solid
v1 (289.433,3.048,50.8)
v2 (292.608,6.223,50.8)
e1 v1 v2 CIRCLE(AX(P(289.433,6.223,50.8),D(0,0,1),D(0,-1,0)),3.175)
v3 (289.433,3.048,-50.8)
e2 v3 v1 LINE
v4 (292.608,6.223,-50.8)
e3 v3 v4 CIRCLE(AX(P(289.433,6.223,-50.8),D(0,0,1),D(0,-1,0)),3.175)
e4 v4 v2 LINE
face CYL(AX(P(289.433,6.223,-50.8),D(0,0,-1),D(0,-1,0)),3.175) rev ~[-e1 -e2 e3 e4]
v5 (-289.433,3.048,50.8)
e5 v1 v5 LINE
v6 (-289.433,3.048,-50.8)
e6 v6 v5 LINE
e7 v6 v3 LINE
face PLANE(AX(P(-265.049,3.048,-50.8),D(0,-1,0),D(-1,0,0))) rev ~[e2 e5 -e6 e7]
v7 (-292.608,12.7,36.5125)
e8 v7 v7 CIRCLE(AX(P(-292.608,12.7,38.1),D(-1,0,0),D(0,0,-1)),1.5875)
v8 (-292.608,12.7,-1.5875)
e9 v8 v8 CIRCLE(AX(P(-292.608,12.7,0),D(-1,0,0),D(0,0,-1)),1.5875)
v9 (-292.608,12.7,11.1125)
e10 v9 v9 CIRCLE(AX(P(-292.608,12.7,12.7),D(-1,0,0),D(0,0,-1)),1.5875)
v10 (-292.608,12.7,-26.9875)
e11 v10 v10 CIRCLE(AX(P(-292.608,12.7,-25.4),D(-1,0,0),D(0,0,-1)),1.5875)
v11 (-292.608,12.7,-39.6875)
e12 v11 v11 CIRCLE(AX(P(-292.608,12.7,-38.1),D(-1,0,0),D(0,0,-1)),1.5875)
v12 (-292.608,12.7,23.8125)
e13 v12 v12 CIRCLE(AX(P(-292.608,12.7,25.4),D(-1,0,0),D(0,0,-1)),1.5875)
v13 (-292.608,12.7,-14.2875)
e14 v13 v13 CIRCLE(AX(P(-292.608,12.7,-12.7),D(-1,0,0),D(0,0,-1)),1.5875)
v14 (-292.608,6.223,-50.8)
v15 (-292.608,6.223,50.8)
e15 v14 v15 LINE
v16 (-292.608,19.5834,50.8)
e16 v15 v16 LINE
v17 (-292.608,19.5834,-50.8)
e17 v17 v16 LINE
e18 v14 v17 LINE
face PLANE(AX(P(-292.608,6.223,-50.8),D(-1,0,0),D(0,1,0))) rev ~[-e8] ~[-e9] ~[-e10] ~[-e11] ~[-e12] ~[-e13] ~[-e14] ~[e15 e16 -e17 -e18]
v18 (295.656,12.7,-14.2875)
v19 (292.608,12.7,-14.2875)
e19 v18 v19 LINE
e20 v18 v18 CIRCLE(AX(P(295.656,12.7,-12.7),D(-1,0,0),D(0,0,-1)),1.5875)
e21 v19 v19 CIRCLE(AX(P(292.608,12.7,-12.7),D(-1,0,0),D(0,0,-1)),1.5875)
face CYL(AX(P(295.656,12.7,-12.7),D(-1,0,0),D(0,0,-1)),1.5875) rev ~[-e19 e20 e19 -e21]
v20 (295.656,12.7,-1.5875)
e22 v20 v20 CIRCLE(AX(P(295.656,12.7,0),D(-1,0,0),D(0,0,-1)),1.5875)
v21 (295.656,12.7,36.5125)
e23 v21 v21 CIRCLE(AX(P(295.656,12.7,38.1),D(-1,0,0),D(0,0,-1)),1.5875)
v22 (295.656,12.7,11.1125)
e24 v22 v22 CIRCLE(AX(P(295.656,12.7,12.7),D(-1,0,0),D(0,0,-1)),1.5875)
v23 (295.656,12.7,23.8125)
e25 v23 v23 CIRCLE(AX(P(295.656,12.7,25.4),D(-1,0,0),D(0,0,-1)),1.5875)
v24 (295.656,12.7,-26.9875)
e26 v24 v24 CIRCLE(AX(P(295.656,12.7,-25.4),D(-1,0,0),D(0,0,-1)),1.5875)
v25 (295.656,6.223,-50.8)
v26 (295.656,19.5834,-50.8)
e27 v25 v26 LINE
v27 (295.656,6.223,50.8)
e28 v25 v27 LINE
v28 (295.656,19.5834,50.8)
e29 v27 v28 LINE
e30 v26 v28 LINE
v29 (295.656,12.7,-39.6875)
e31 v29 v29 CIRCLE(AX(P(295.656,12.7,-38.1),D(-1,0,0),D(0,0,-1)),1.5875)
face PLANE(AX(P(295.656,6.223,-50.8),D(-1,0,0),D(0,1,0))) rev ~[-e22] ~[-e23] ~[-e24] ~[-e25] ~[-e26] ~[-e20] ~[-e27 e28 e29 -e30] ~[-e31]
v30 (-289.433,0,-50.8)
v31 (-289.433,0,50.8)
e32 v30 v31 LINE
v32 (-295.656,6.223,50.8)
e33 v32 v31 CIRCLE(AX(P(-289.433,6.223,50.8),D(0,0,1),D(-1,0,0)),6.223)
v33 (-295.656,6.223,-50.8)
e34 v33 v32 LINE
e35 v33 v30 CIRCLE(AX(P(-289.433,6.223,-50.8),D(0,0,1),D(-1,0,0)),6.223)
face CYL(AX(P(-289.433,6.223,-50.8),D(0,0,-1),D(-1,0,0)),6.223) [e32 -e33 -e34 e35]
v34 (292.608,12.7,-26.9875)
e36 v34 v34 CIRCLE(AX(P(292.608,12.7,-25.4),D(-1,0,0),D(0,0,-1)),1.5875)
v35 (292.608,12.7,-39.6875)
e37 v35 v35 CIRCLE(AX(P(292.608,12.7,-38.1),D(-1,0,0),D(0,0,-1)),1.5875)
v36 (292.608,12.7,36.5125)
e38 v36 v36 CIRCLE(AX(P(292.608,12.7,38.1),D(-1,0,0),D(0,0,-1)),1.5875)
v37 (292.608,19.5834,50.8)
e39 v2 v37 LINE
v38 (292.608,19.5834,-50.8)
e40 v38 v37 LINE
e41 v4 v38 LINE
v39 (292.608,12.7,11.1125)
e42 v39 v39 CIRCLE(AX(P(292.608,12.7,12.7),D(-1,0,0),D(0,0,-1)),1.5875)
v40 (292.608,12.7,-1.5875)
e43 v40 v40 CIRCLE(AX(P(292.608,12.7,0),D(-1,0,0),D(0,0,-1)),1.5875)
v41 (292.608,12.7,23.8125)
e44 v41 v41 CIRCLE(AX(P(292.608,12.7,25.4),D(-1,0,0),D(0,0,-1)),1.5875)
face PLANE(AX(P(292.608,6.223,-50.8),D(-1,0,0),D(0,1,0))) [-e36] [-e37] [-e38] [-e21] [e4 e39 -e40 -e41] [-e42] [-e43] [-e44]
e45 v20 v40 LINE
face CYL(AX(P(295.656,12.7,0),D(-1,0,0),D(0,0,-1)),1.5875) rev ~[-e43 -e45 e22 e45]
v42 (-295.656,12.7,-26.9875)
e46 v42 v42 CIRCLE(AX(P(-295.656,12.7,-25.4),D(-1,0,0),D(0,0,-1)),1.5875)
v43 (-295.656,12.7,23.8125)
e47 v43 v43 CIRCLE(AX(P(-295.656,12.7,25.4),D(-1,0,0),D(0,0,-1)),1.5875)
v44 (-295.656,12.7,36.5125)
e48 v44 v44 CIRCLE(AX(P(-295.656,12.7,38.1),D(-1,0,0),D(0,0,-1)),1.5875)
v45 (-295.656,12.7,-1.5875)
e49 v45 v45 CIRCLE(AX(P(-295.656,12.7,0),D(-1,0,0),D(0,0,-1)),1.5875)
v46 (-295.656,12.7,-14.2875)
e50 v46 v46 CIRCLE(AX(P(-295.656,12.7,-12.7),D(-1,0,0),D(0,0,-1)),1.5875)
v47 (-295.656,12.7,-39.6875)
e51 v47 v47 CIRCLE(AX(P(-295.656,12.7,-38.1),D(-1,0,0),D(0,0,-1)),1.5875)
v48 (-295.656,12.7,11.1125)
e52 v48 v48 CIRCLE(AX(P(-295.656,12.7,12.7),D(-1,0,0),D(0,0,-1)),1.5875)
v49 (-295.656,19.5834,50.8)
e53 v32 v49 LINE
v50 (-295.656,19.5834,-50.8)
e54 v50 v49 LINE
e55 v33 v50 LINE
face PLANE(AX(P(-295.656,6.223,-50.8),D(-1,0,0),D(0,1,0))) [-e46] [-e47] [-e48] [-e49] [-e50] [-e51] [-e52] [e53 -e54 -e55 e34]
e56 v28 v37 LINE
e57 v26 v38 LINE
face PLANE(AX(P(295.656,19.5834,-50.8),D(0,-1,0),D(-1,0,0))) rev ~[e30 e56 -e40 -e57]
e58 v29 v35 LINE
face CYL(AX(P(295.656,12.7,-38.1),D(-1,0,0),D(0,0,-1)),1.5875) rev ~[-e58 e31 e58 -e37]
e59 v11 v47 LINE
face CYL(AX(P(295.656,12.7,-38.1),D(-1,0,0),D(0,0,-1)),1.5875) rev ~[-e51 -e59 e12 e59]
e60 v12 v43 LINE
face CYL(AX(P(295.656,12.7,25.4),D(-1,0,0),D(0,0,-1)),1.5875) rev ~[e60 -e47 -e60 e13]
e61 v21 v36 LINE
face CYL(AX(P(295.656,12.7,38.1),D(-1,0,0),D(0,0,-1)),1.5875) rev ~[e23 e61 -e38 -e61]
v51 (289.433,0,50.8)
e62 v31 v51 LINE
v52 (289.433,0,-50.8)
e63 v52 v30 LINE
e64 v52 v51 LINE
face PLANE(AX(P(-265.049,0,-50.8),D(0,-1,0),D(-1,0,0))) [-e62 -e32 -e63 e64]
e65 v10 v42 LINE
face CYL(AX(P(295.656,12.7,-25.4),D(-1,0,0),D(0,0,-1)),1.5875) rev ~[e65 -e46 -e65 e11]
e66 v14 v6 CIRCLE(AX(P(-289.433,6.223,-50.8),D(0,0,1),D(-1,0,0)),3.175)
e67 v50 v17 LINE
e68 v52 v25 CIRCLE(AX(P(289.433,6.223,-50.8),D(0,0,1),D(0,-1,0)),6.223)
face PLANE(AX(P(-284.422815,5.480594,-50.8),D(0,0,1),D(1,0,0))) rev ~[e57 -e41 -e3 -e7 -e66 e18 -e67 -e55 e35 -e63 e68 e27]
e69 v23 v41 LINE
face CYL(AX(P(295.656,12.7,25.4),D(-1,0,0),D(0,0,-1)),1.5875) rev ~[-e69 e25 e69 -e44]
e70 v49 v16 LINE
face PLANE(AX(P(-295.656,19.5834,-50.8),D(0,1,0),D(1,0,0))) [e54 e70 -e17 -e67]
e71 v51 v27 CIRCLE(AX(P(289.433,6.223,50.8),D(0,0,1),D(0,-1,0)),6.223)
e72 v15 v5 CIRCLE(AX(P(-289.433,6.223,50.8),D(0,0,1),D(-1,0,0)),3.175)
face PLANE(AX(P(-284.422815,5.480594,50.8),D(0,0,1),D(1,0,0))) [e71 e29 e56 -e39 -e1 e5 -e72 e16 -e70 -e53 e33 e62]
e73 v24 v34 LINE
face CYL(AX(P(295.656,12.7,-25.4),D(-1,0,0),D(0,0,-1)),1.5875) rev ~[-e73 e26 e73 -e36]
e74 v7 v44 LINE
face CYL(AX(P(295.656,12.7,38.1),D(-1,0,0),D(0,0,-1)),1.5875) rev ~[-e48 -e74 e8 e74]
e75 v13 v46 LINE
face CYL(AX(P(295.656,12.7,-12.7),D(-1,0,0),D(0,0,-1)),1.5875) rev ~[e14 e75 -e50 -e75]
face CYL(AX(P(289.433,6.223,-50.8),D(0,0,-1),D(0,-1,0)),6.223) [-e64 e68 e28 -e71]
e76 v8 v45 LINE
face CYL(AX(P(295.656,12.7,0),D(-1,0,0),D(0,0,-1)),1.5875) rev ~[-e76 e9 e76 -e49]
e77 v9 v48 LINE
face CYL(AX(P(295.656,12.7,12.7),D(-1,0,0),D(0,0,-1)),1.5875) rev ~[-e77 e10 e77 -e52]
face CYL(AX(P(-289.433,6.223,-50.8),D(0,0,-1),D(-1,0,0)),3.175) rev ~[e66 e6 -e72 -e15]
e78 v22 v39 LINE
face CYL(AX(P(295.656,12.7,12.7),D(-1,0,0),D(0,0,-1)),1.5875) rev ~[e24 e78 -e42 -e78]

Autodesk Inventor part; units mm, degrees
ref_plane "YZ Plane" through (0, 0, 0) normal (1, 0, 0) x (0, 1, 0)
ref_plane "XZ Plane" through (0, 0, 0) normal (0, 1, 0) x (-1, 0, 0)
ref_plane "XY Plane" through (0, 0, 0) normal (0, 0, 1) x (1, 0, 0)
sketch "Sketch2" plane through (0, 0, 0) normal (0, 1, 0) x (-1, 0, 0)
  line L0 (-289.433, 50.8) -> (289.433, 50.8)
  line L1 (289.433, 50.8) -> (289.433, -50.8)
  line L2 (289.433, -50.8) -> (-289.433, -50.8)
  line L3 (-289.433, -50.8) -> (-289.433, 50.8)
  point P0 (0, 0)
  dimension "d0" = 289.433
  dimension "d1" = 289.433
  dimension "d2" = 50.8
  dimension "d3" = 50.8
extrude "Plate1" add sketch "Sketch2" along normal blind 3.048
sketch "Sketch3" plane through (-289.433, 0, 50.8) normal (0, 0, 1) x (1, 0, 0)
  arc A0 (578.866, 0) -> (585.089, 6.223) centre (578.866, 6.223) ccw
  line L0 (578.866, 6.223) -> (585.089, 6.223) construction
  line L1 (578.866, 6.223) -> (578.866, 0) construction
  line L2 (585.089, 6.223) -> (585.089, 19.5834)
  point P0 (578.866, 3.048)
  point P1 (289.433, 0)
  dimension "d5" = 90
  dimension "d6" = 6.223
  dimension "d7" = 6.223
  dimension "d8" = 13.3604
contour flange "Contour Flange1" sketch "Sketch3" thickness 3.048 bend radius 3.048 curves A0 L2 edges at (289.433, 0, 0) running between points at (289.433, 0, -50.8) (289.433, 0, 50.8)
bend "Bend1"
corner "Corner1"
sketch "Sketch4" plane through (-289.433, 0, 50.8) normal (0, 0, 1) x (1, 0, 0)
  arc A0 (-6.223, 6.223) -> (0, 0) centre (0, 6.223) ccw
  line L0 (0, 6.223) -> (-6.223, 6.223) construction
  line L1 (0, 6.223) -> (0, 0) construction
  line L2 (-6.223, 6.223) -> (-6.223, 19.5834)
  point P0 (0, 3.048)
  point P1 (289.433, 0)
  dimension "d18" = 90
  dimension "d19" = 6.223
  dimension "d20" = 6.223
  dimension "d21" = 13.3604
contour flange "Contour Flange2" sketch "Sketch4" thickness 3.048 bend radius 3.048 curves A0 L2 edges at (-289.433, 0, 0) running between points at (-289.433, 0, 50.8) (-289.433, 0, -50.8)
bend "Bend2"
corner "Corner2"
sketch "Sketch5" plane through (295.656, 6.223, -50.8) normal (1, 0, 0) x (0, 0, -1)
  line L0 (-101.6, 0) -> (-101.6, 13.3604) projected
  line L1 (0, -6.223) -> (-101.6, -6.223) projected
  point P0 (-50.8, -6.223)
  point P1 (-88.9, 6.477)
  dimension "d31" = 12.7
  dimension "d32" = 12.7
hole "Hole1" at (295.656, 12.7, 38.1) direction (-1, 0, 0) diameter 3.175 end through all
sketch "Sketch6" plane through (295.656, 6.223, -50.8) normal (1, 0, 0) x (0, 0, -1)
  circle A0 centre (-88.9, 6.477) radius 1.5875 projected
  line L0 (-101.6, 0) -> (-101.6, 13.3604) projected
  line L1 (-88.9, 6.477) -> (-74.5256, 6.477)
  point P0 (-50.8, -6.223)
pattern_linear "Rectangular Pattern1" count 7 spacing 12.7 along (0, 0, -1) of "Hole1"
equation "\"d38\" = Thickness"
equation "\"d9\" = BendReliefWidth"
equation "\"d10\" = BendReliefDepth"
equation "\"d11\" = MinimumRemnant"
equation "\"d12\" = BendRadius"
equation "\"d13\" = BendRadius"
equation "\"d15\" = CornerReliefSize"
equation "\"d16\" = GapSize"
equation "\"d17\" = JacobiRadiusSize"
equation "\"d22\" = BendReliefWidth"
equation "\"d23\" = BendReliefDepth"
equation "\"d24\" = MinimumRemnant"
equation "\"d25\" = BendRadius"
equation "\"d26\" = BendRadius"
equation "\"d28\" = CornerReliefSize"
equation "\"d29\" = GapSize"
equation "\"d30\" = JacobiRadiusSize"
equation "\"d1\" = d0"
equation "\"d3\" = d2"
equation "\"BendRadius\" = Thickness"
equation "\"BendReliefWidth\" = Thickness"
equation "\"BendReliefDepth\" = 0.5 * Thickness"
equation "\"CornerReliefSize\" = 4 * Thickness"
equation "\"MinimumRemnant\" = 2 * Thickness"
equation "\"TransitionRadius\" = BendRadius"
equation "\"JacobiRadiusSize\" = BendRadius"
equation "\"GapSize\" = Thickness"
equation "\"d4\" = BendRadius"
equation "\"Thickness\" = 3.048"
properties part number "Base Crossbar"
